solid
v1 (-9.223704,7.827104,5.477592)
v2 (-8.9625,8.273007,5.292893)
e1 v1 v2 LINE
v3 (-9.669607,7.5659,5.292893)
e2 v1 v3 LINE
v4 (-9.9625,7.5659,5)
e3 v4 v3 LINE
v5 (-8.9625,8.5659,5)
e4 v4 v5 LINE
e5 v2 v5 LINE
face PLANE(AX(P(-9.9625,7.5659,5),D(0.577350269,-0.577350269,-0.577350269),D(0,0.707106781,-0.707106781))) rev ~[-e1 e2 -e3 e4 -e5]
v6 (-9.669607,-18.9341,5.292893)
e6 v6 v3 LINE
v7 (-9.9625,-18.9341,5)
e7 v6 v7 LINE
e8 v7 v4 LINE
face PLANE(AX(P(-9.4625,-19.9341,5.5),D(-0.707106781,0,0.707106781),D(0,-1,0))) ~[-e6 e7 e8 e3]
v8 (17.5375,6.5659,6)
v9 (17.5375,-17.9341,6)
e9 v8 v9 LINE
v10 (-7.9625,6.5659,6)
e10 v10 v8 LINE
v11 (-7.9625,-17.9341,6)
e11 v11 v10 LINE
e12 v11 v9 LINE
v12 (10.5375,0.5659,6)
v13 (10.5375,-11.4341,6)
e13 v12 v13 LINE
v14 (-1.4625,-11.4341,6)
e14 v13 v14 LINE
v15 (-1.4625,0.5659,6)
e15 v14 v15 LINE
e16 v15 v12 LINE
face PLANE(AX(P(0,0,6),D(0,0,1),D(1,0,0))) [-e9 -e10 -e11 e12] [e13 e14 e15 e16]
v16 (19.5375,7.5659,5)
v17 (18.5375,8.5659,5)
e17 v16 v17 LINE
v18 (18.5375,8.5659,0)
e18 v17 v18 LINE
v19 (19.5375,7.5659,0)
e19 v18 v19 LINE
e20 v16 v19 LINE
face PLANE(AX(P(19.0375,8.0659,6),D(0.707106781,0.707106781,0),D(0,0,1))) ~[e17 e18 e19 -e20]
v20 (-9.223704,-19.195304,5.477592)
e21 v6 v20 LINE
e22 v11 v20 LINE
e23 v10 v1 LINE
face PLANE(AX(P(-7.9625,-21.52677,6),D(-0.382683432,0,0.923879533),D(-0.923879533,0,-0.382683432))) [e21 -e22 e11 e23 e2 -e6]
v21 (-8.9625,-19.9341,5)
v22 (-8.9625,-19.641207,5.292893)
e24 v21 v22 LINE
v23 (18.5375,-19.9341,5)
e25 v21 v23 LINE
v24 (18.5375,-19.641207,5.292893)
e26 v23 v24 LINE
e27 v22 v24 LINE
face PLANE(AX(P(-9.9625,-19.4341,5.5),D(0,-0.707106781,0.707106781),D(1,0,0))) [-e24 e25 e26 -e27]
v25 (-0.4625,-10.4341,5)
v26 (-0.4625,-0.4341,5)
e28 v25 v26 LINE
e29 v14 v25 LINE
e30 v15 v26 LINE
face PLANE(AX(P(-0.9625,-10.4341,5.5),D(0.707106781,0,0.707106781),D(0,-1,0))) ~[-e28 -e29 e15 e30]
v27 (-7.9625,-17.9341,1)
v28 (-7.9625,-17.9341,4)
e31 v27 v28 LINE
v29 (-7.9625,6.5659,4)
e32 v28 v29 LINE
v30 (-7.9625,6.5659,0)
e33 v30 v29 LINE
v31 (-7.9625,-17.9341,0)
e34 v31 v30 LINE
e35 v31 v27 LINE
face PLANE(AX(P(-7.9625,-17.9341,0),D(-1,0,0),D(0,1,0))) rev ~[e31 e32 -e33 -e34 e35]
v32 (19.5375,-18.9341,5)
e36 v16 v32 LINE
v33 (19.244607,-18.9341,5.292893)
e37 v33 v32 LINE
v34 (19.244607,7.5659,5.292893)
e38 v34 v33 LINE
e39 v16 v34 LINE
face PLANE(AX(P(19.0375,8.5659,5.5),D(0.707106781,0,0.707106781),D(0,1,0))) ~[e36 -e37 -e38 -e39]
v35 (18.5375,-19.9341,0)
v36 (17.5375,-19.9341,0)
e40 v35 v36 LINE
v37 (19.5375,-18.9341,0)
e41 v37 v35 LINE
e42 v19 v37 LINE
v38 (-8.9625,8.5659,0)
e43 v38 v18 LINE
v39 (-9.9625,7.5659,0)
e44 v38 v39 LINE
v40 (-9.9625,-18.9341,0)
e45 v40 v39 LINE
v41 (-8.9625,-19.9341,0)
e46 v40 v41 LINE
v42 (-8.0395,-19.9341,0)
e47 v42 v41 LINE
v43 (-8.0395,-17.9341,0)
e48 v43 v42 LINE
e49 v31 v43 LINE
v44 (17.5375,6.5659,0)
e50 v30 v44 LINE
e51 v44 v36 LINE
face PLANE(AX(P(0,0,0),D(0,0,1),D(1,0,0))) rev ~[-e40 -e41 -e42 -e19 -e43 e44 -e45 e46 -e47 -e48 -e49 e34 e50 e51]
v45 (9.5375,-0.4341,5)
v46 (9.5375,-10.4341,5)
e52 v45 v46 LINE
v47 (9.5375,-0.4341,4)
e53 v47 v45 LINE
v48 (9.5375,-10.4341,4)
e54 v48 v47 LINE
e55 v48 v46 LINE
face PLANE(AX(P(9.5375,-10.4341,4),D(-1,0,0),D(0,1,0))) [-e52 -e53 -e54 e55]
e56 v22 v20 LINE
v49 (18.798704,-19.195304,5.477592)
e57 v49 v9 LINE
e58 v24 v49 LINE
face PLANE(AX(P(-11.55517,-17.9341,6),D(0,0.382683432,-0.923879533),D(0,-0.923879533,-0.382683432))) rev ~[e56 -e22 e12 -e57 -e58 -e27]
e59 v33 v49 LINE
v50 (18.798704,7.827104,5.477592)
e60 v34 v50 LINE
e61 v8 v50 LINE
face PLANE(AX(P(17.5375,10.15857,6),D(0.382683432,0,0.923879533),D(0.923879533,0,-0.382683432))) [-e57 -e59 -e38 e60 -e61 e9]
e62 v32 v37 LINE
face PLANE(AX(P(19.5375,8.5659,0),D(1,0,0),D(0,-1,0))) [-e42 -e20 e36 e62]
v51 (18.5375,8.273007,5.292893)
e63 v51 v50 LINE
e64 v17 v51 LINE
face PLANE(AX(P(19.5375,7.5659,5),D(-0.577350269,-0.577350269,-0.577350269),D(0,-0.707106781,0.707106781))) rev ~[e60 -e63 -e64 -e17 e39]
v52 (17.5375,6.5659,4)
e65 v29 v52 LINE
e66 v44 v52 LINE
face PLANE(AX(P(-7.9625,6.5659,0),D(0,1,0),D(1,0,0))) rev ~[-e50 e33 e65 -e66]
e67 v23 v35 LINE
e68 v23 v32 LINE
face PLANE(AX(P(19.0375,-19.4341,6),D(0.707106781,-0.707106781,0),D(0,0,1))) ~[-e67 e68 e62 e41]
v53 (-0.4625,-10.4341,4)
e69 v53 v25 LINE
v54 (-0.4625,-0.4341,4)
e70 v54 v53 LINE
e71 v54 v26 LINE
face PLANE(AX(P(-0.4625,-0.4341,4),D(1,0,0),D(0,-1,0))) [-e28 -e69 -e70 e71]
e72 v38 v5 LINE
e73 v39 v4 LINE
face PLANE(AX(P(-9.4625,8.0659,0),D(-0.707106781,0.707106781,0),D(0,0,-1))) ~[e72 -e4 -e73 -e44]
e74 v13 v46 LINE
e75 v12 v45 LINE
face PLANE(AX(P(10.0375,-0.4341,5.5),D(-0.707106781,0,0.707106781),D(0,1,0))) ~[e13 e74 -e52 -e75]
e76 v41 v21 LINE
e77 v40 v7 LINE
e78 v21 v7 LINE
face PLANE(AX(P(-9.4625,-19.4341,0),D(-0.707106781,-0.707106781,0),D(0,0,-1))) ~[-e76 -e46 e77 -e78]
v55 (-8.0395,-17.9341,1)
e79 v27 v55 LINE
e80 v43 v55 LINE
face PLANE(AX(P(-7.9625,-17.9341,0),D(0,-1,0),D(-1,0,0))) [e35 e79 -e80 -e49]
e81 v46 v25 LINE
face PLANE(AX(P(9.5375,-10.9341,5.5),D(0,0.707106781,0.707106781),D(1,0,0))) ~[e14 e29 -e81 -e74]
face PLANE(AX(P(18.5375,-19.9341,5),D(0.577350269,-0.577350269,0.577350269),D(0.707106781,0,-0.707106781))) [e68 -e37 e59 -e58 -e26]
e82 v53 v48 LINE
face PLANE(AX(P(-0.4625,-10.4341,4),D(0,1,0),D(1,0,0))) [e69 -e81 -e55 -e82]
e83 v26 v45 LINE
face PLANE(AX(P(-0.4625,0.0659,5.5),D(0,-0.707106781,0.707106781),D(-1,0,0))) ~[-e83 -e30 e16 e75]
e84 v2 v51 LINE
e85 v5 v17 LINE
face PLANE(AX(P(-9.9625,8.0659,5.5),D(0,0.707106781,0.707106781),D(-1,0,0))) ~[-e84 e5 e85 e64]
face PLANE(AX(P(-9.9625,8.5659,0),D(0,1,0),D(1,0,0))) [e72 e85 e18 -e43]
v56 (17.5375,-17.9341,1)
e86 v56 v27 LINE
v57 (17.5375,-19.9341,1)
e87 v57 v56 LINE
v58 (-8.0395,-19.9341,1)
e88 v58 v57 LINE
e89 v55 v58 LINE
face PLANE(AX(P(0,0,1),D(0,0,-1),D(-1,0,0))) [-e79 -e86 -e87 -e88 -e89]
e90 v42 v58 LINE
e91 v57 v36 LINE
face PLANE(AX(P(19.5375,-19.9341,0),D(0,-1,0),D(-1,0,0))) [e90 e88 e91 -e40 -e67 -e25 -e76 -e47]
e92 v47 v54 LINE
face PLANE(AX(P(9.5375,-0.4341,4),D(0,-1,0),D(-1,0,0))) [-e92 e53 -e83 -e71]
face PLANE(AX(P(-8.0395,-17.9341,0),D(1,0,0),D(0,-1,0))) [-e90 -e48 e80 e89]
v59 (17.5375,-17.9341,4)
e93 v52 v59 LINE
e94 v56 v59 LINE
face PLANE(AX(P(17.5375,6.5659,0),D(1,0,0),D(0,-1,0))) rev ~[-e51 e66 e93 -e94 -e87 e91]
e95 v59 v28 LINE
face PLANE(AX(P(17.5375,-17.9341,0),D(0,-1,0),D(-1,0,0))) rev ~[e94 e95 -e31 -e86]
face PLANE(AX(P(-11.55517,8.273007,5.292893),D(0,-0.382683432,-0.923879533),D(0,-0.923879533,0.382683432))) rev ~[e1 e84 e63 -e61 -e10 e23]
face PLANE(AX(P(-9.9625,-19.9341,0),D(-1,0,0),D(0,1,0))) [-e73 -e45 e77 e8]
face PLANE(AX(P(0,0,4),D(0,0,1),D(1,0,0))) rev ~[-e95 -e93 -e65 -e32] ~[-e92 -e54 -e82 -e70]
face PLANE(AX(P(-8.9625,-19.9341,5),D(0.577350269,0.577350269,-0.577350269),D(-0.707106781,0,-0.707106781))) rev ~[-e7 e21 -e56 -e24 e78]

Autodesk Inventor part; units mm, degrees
ref_plane "YZ Plane" through (0, 0, 0) normal (1, 0, 0) x (0, 1, 0)
ref_plane "XZ Plane" through (0, 0, 0) normal (0, 1, 0) x (-1, 0, 0)
ref_plane "XY Plane" through (0, 0, 0) normal (0, 0, 1) x (1, 0, 0)
sketch "Skizze1" plane through (0, 0, 0) normal (0, 0, 1) x (1, 0, 0)
  line L0 (-7.9625, 6.5659) -> (17.5375, 6.5659)
  line L1 (17.5375, 6.5659) -> (17.5375, -17.9341)
  line L2 (17.5375, -17.9341) -> (-7.9625, -17.9341)
  line L3 (-7.9625, -17.9341) -> (-7.9625, 6.5659)
  line L4 (-9.9625, 8.5659) -> (19.5375, 8.5659)
  line L5 (19.5375, 8.5659) -> (19.5375, -19.9341)
  line L6 (19.5375, -19.9341) -> (-9.9625, -19.9341)
  line L7 (-9.9625, -19.9341) -> (-9.9625, 8.5659)
  point P0 (0, 0)
  dimension "d0" = 25.5
  dimension "d1" = 24.5
  dimension "d2" = 2
  dimension "d3" = 2
  dimension "d4" = 2
  dimension "d5" = 2
extrude "Extrusion1" add sketch "Skizze1" along normal blind 4
sketch "Skizze2" plane through (0, 0, 4) normal (0, 0, 1) x (1, 0, 0)
  line L0 (-9.9625, -19.9341) -> (19.5375, -19.9341) projected
  line L1 (-9.9625, 8.5659) -> (19.5375, 8.5659)
  line L2 (19.5375, 8.5659) -> (19.5375, -19.9341)
  line L3 (19.5375, -19.9341) -> (-9.9625, -19.9341)
  line L4 (-9.9625, -19.9341) -> (-9.9625, 8.5659)
  point P0 (0, 0)
extrude "Extrusion2" add sketch "Skizze2" along normal blind 2
chamfer "Fase1" distance 1 angle 45 8 edges at (4.7875, 8.5659, 6) (-9.9625, -5.6841, 6) (-9.9625, 8.5659, 3) (19.5375, 8.5659, 3) (19.5375, -5.6841, 6) (4.7875, -19.9341, 6) (19.5375, -19.9341, 3) (-9.9625, -19.9341, 3)
chamfer "Fase2" distance 1 angle 45 4 edges at (18.5375, -5.6841, 6) (4.7875, 7.5659, 6) (-8.9625, -5.6841, 6) (4.7875, -18.9341, 6)
sketch "Skizze3" plane through (0, 0, 4) normal (0, 0, -1) x (-1, 0, 0)
  line L0 (-9.5375, -0.4341) -> (0.4625, -0.4341)
  line L1 (0.4625, -0.4341) -> (0.4625, -10.4341)
  line L2 (0.4625, -10.4341) -> (-9.5375, -10.4341)
  line L3 (-9.5375, -10.4341) -> (-9.5375, -0.4341)
  line L4 (-17.5375, 6.5659) -> (7.9625, 6.5659) projected
  line L5 (7.9625, -17.9341) -> (7.9625, 6.5659) projected
  line L6 (-17.5375, 6.5659) -> (-17.5375, -17.9341) projected
  line L7 (-17.5375, -17.9341) -> (7.9625, -17.9341) projected
  point P0 (0, 0)
  dimension "d16" = 10
  dimension "d17" = 10
  dimension "d18" = 7
  dimension "d19" = 7.5
  dimension "d20" = 8
  dimension "d21" = 7.5
extrude "Extrusion3" cut sketch "Skizze3" against normal blind 67 contours L0 L1 L2 L3
chamfer "Fase3" distance 1 angle 45 4 edges at (4.5375, -0.4341, 6) (-0.4625, -5.4341, 6) (9.5375, -5.4341, 6) (4.5375, -10.4341, 6)
sketch "Skizze4" plane through (0, 0, 0) normal (0, 0, -1) x (-1, 0, 0)
  line L0 (-17.5375, -17.9341) -> (7.9625, -17.9341) projected
  line L1 (-17.5375, -17.9341) -> (8.0395, -17.9341)
  line L2 (8.0395, -17.9341) -> (8.0395, -21.0501)
  line L3 (8.0395, -21.0501) -> (-17.5375, -21.0501)
  line L4 (-17.5375, -21.0501) -> (-17.5375, -17.9341)
  point P0 (0, 0)
extrude "Extrusion4" cut sketch "Skizze4" against normal blind 1
sketch "Skizze5" plane through (19.5375, -18.9341, 0) normal (1, 0, 0) x (0, 0, -1)
  point P0 (0, 18.9341)
properties part number "Raspberrycamhalter oberteil"
